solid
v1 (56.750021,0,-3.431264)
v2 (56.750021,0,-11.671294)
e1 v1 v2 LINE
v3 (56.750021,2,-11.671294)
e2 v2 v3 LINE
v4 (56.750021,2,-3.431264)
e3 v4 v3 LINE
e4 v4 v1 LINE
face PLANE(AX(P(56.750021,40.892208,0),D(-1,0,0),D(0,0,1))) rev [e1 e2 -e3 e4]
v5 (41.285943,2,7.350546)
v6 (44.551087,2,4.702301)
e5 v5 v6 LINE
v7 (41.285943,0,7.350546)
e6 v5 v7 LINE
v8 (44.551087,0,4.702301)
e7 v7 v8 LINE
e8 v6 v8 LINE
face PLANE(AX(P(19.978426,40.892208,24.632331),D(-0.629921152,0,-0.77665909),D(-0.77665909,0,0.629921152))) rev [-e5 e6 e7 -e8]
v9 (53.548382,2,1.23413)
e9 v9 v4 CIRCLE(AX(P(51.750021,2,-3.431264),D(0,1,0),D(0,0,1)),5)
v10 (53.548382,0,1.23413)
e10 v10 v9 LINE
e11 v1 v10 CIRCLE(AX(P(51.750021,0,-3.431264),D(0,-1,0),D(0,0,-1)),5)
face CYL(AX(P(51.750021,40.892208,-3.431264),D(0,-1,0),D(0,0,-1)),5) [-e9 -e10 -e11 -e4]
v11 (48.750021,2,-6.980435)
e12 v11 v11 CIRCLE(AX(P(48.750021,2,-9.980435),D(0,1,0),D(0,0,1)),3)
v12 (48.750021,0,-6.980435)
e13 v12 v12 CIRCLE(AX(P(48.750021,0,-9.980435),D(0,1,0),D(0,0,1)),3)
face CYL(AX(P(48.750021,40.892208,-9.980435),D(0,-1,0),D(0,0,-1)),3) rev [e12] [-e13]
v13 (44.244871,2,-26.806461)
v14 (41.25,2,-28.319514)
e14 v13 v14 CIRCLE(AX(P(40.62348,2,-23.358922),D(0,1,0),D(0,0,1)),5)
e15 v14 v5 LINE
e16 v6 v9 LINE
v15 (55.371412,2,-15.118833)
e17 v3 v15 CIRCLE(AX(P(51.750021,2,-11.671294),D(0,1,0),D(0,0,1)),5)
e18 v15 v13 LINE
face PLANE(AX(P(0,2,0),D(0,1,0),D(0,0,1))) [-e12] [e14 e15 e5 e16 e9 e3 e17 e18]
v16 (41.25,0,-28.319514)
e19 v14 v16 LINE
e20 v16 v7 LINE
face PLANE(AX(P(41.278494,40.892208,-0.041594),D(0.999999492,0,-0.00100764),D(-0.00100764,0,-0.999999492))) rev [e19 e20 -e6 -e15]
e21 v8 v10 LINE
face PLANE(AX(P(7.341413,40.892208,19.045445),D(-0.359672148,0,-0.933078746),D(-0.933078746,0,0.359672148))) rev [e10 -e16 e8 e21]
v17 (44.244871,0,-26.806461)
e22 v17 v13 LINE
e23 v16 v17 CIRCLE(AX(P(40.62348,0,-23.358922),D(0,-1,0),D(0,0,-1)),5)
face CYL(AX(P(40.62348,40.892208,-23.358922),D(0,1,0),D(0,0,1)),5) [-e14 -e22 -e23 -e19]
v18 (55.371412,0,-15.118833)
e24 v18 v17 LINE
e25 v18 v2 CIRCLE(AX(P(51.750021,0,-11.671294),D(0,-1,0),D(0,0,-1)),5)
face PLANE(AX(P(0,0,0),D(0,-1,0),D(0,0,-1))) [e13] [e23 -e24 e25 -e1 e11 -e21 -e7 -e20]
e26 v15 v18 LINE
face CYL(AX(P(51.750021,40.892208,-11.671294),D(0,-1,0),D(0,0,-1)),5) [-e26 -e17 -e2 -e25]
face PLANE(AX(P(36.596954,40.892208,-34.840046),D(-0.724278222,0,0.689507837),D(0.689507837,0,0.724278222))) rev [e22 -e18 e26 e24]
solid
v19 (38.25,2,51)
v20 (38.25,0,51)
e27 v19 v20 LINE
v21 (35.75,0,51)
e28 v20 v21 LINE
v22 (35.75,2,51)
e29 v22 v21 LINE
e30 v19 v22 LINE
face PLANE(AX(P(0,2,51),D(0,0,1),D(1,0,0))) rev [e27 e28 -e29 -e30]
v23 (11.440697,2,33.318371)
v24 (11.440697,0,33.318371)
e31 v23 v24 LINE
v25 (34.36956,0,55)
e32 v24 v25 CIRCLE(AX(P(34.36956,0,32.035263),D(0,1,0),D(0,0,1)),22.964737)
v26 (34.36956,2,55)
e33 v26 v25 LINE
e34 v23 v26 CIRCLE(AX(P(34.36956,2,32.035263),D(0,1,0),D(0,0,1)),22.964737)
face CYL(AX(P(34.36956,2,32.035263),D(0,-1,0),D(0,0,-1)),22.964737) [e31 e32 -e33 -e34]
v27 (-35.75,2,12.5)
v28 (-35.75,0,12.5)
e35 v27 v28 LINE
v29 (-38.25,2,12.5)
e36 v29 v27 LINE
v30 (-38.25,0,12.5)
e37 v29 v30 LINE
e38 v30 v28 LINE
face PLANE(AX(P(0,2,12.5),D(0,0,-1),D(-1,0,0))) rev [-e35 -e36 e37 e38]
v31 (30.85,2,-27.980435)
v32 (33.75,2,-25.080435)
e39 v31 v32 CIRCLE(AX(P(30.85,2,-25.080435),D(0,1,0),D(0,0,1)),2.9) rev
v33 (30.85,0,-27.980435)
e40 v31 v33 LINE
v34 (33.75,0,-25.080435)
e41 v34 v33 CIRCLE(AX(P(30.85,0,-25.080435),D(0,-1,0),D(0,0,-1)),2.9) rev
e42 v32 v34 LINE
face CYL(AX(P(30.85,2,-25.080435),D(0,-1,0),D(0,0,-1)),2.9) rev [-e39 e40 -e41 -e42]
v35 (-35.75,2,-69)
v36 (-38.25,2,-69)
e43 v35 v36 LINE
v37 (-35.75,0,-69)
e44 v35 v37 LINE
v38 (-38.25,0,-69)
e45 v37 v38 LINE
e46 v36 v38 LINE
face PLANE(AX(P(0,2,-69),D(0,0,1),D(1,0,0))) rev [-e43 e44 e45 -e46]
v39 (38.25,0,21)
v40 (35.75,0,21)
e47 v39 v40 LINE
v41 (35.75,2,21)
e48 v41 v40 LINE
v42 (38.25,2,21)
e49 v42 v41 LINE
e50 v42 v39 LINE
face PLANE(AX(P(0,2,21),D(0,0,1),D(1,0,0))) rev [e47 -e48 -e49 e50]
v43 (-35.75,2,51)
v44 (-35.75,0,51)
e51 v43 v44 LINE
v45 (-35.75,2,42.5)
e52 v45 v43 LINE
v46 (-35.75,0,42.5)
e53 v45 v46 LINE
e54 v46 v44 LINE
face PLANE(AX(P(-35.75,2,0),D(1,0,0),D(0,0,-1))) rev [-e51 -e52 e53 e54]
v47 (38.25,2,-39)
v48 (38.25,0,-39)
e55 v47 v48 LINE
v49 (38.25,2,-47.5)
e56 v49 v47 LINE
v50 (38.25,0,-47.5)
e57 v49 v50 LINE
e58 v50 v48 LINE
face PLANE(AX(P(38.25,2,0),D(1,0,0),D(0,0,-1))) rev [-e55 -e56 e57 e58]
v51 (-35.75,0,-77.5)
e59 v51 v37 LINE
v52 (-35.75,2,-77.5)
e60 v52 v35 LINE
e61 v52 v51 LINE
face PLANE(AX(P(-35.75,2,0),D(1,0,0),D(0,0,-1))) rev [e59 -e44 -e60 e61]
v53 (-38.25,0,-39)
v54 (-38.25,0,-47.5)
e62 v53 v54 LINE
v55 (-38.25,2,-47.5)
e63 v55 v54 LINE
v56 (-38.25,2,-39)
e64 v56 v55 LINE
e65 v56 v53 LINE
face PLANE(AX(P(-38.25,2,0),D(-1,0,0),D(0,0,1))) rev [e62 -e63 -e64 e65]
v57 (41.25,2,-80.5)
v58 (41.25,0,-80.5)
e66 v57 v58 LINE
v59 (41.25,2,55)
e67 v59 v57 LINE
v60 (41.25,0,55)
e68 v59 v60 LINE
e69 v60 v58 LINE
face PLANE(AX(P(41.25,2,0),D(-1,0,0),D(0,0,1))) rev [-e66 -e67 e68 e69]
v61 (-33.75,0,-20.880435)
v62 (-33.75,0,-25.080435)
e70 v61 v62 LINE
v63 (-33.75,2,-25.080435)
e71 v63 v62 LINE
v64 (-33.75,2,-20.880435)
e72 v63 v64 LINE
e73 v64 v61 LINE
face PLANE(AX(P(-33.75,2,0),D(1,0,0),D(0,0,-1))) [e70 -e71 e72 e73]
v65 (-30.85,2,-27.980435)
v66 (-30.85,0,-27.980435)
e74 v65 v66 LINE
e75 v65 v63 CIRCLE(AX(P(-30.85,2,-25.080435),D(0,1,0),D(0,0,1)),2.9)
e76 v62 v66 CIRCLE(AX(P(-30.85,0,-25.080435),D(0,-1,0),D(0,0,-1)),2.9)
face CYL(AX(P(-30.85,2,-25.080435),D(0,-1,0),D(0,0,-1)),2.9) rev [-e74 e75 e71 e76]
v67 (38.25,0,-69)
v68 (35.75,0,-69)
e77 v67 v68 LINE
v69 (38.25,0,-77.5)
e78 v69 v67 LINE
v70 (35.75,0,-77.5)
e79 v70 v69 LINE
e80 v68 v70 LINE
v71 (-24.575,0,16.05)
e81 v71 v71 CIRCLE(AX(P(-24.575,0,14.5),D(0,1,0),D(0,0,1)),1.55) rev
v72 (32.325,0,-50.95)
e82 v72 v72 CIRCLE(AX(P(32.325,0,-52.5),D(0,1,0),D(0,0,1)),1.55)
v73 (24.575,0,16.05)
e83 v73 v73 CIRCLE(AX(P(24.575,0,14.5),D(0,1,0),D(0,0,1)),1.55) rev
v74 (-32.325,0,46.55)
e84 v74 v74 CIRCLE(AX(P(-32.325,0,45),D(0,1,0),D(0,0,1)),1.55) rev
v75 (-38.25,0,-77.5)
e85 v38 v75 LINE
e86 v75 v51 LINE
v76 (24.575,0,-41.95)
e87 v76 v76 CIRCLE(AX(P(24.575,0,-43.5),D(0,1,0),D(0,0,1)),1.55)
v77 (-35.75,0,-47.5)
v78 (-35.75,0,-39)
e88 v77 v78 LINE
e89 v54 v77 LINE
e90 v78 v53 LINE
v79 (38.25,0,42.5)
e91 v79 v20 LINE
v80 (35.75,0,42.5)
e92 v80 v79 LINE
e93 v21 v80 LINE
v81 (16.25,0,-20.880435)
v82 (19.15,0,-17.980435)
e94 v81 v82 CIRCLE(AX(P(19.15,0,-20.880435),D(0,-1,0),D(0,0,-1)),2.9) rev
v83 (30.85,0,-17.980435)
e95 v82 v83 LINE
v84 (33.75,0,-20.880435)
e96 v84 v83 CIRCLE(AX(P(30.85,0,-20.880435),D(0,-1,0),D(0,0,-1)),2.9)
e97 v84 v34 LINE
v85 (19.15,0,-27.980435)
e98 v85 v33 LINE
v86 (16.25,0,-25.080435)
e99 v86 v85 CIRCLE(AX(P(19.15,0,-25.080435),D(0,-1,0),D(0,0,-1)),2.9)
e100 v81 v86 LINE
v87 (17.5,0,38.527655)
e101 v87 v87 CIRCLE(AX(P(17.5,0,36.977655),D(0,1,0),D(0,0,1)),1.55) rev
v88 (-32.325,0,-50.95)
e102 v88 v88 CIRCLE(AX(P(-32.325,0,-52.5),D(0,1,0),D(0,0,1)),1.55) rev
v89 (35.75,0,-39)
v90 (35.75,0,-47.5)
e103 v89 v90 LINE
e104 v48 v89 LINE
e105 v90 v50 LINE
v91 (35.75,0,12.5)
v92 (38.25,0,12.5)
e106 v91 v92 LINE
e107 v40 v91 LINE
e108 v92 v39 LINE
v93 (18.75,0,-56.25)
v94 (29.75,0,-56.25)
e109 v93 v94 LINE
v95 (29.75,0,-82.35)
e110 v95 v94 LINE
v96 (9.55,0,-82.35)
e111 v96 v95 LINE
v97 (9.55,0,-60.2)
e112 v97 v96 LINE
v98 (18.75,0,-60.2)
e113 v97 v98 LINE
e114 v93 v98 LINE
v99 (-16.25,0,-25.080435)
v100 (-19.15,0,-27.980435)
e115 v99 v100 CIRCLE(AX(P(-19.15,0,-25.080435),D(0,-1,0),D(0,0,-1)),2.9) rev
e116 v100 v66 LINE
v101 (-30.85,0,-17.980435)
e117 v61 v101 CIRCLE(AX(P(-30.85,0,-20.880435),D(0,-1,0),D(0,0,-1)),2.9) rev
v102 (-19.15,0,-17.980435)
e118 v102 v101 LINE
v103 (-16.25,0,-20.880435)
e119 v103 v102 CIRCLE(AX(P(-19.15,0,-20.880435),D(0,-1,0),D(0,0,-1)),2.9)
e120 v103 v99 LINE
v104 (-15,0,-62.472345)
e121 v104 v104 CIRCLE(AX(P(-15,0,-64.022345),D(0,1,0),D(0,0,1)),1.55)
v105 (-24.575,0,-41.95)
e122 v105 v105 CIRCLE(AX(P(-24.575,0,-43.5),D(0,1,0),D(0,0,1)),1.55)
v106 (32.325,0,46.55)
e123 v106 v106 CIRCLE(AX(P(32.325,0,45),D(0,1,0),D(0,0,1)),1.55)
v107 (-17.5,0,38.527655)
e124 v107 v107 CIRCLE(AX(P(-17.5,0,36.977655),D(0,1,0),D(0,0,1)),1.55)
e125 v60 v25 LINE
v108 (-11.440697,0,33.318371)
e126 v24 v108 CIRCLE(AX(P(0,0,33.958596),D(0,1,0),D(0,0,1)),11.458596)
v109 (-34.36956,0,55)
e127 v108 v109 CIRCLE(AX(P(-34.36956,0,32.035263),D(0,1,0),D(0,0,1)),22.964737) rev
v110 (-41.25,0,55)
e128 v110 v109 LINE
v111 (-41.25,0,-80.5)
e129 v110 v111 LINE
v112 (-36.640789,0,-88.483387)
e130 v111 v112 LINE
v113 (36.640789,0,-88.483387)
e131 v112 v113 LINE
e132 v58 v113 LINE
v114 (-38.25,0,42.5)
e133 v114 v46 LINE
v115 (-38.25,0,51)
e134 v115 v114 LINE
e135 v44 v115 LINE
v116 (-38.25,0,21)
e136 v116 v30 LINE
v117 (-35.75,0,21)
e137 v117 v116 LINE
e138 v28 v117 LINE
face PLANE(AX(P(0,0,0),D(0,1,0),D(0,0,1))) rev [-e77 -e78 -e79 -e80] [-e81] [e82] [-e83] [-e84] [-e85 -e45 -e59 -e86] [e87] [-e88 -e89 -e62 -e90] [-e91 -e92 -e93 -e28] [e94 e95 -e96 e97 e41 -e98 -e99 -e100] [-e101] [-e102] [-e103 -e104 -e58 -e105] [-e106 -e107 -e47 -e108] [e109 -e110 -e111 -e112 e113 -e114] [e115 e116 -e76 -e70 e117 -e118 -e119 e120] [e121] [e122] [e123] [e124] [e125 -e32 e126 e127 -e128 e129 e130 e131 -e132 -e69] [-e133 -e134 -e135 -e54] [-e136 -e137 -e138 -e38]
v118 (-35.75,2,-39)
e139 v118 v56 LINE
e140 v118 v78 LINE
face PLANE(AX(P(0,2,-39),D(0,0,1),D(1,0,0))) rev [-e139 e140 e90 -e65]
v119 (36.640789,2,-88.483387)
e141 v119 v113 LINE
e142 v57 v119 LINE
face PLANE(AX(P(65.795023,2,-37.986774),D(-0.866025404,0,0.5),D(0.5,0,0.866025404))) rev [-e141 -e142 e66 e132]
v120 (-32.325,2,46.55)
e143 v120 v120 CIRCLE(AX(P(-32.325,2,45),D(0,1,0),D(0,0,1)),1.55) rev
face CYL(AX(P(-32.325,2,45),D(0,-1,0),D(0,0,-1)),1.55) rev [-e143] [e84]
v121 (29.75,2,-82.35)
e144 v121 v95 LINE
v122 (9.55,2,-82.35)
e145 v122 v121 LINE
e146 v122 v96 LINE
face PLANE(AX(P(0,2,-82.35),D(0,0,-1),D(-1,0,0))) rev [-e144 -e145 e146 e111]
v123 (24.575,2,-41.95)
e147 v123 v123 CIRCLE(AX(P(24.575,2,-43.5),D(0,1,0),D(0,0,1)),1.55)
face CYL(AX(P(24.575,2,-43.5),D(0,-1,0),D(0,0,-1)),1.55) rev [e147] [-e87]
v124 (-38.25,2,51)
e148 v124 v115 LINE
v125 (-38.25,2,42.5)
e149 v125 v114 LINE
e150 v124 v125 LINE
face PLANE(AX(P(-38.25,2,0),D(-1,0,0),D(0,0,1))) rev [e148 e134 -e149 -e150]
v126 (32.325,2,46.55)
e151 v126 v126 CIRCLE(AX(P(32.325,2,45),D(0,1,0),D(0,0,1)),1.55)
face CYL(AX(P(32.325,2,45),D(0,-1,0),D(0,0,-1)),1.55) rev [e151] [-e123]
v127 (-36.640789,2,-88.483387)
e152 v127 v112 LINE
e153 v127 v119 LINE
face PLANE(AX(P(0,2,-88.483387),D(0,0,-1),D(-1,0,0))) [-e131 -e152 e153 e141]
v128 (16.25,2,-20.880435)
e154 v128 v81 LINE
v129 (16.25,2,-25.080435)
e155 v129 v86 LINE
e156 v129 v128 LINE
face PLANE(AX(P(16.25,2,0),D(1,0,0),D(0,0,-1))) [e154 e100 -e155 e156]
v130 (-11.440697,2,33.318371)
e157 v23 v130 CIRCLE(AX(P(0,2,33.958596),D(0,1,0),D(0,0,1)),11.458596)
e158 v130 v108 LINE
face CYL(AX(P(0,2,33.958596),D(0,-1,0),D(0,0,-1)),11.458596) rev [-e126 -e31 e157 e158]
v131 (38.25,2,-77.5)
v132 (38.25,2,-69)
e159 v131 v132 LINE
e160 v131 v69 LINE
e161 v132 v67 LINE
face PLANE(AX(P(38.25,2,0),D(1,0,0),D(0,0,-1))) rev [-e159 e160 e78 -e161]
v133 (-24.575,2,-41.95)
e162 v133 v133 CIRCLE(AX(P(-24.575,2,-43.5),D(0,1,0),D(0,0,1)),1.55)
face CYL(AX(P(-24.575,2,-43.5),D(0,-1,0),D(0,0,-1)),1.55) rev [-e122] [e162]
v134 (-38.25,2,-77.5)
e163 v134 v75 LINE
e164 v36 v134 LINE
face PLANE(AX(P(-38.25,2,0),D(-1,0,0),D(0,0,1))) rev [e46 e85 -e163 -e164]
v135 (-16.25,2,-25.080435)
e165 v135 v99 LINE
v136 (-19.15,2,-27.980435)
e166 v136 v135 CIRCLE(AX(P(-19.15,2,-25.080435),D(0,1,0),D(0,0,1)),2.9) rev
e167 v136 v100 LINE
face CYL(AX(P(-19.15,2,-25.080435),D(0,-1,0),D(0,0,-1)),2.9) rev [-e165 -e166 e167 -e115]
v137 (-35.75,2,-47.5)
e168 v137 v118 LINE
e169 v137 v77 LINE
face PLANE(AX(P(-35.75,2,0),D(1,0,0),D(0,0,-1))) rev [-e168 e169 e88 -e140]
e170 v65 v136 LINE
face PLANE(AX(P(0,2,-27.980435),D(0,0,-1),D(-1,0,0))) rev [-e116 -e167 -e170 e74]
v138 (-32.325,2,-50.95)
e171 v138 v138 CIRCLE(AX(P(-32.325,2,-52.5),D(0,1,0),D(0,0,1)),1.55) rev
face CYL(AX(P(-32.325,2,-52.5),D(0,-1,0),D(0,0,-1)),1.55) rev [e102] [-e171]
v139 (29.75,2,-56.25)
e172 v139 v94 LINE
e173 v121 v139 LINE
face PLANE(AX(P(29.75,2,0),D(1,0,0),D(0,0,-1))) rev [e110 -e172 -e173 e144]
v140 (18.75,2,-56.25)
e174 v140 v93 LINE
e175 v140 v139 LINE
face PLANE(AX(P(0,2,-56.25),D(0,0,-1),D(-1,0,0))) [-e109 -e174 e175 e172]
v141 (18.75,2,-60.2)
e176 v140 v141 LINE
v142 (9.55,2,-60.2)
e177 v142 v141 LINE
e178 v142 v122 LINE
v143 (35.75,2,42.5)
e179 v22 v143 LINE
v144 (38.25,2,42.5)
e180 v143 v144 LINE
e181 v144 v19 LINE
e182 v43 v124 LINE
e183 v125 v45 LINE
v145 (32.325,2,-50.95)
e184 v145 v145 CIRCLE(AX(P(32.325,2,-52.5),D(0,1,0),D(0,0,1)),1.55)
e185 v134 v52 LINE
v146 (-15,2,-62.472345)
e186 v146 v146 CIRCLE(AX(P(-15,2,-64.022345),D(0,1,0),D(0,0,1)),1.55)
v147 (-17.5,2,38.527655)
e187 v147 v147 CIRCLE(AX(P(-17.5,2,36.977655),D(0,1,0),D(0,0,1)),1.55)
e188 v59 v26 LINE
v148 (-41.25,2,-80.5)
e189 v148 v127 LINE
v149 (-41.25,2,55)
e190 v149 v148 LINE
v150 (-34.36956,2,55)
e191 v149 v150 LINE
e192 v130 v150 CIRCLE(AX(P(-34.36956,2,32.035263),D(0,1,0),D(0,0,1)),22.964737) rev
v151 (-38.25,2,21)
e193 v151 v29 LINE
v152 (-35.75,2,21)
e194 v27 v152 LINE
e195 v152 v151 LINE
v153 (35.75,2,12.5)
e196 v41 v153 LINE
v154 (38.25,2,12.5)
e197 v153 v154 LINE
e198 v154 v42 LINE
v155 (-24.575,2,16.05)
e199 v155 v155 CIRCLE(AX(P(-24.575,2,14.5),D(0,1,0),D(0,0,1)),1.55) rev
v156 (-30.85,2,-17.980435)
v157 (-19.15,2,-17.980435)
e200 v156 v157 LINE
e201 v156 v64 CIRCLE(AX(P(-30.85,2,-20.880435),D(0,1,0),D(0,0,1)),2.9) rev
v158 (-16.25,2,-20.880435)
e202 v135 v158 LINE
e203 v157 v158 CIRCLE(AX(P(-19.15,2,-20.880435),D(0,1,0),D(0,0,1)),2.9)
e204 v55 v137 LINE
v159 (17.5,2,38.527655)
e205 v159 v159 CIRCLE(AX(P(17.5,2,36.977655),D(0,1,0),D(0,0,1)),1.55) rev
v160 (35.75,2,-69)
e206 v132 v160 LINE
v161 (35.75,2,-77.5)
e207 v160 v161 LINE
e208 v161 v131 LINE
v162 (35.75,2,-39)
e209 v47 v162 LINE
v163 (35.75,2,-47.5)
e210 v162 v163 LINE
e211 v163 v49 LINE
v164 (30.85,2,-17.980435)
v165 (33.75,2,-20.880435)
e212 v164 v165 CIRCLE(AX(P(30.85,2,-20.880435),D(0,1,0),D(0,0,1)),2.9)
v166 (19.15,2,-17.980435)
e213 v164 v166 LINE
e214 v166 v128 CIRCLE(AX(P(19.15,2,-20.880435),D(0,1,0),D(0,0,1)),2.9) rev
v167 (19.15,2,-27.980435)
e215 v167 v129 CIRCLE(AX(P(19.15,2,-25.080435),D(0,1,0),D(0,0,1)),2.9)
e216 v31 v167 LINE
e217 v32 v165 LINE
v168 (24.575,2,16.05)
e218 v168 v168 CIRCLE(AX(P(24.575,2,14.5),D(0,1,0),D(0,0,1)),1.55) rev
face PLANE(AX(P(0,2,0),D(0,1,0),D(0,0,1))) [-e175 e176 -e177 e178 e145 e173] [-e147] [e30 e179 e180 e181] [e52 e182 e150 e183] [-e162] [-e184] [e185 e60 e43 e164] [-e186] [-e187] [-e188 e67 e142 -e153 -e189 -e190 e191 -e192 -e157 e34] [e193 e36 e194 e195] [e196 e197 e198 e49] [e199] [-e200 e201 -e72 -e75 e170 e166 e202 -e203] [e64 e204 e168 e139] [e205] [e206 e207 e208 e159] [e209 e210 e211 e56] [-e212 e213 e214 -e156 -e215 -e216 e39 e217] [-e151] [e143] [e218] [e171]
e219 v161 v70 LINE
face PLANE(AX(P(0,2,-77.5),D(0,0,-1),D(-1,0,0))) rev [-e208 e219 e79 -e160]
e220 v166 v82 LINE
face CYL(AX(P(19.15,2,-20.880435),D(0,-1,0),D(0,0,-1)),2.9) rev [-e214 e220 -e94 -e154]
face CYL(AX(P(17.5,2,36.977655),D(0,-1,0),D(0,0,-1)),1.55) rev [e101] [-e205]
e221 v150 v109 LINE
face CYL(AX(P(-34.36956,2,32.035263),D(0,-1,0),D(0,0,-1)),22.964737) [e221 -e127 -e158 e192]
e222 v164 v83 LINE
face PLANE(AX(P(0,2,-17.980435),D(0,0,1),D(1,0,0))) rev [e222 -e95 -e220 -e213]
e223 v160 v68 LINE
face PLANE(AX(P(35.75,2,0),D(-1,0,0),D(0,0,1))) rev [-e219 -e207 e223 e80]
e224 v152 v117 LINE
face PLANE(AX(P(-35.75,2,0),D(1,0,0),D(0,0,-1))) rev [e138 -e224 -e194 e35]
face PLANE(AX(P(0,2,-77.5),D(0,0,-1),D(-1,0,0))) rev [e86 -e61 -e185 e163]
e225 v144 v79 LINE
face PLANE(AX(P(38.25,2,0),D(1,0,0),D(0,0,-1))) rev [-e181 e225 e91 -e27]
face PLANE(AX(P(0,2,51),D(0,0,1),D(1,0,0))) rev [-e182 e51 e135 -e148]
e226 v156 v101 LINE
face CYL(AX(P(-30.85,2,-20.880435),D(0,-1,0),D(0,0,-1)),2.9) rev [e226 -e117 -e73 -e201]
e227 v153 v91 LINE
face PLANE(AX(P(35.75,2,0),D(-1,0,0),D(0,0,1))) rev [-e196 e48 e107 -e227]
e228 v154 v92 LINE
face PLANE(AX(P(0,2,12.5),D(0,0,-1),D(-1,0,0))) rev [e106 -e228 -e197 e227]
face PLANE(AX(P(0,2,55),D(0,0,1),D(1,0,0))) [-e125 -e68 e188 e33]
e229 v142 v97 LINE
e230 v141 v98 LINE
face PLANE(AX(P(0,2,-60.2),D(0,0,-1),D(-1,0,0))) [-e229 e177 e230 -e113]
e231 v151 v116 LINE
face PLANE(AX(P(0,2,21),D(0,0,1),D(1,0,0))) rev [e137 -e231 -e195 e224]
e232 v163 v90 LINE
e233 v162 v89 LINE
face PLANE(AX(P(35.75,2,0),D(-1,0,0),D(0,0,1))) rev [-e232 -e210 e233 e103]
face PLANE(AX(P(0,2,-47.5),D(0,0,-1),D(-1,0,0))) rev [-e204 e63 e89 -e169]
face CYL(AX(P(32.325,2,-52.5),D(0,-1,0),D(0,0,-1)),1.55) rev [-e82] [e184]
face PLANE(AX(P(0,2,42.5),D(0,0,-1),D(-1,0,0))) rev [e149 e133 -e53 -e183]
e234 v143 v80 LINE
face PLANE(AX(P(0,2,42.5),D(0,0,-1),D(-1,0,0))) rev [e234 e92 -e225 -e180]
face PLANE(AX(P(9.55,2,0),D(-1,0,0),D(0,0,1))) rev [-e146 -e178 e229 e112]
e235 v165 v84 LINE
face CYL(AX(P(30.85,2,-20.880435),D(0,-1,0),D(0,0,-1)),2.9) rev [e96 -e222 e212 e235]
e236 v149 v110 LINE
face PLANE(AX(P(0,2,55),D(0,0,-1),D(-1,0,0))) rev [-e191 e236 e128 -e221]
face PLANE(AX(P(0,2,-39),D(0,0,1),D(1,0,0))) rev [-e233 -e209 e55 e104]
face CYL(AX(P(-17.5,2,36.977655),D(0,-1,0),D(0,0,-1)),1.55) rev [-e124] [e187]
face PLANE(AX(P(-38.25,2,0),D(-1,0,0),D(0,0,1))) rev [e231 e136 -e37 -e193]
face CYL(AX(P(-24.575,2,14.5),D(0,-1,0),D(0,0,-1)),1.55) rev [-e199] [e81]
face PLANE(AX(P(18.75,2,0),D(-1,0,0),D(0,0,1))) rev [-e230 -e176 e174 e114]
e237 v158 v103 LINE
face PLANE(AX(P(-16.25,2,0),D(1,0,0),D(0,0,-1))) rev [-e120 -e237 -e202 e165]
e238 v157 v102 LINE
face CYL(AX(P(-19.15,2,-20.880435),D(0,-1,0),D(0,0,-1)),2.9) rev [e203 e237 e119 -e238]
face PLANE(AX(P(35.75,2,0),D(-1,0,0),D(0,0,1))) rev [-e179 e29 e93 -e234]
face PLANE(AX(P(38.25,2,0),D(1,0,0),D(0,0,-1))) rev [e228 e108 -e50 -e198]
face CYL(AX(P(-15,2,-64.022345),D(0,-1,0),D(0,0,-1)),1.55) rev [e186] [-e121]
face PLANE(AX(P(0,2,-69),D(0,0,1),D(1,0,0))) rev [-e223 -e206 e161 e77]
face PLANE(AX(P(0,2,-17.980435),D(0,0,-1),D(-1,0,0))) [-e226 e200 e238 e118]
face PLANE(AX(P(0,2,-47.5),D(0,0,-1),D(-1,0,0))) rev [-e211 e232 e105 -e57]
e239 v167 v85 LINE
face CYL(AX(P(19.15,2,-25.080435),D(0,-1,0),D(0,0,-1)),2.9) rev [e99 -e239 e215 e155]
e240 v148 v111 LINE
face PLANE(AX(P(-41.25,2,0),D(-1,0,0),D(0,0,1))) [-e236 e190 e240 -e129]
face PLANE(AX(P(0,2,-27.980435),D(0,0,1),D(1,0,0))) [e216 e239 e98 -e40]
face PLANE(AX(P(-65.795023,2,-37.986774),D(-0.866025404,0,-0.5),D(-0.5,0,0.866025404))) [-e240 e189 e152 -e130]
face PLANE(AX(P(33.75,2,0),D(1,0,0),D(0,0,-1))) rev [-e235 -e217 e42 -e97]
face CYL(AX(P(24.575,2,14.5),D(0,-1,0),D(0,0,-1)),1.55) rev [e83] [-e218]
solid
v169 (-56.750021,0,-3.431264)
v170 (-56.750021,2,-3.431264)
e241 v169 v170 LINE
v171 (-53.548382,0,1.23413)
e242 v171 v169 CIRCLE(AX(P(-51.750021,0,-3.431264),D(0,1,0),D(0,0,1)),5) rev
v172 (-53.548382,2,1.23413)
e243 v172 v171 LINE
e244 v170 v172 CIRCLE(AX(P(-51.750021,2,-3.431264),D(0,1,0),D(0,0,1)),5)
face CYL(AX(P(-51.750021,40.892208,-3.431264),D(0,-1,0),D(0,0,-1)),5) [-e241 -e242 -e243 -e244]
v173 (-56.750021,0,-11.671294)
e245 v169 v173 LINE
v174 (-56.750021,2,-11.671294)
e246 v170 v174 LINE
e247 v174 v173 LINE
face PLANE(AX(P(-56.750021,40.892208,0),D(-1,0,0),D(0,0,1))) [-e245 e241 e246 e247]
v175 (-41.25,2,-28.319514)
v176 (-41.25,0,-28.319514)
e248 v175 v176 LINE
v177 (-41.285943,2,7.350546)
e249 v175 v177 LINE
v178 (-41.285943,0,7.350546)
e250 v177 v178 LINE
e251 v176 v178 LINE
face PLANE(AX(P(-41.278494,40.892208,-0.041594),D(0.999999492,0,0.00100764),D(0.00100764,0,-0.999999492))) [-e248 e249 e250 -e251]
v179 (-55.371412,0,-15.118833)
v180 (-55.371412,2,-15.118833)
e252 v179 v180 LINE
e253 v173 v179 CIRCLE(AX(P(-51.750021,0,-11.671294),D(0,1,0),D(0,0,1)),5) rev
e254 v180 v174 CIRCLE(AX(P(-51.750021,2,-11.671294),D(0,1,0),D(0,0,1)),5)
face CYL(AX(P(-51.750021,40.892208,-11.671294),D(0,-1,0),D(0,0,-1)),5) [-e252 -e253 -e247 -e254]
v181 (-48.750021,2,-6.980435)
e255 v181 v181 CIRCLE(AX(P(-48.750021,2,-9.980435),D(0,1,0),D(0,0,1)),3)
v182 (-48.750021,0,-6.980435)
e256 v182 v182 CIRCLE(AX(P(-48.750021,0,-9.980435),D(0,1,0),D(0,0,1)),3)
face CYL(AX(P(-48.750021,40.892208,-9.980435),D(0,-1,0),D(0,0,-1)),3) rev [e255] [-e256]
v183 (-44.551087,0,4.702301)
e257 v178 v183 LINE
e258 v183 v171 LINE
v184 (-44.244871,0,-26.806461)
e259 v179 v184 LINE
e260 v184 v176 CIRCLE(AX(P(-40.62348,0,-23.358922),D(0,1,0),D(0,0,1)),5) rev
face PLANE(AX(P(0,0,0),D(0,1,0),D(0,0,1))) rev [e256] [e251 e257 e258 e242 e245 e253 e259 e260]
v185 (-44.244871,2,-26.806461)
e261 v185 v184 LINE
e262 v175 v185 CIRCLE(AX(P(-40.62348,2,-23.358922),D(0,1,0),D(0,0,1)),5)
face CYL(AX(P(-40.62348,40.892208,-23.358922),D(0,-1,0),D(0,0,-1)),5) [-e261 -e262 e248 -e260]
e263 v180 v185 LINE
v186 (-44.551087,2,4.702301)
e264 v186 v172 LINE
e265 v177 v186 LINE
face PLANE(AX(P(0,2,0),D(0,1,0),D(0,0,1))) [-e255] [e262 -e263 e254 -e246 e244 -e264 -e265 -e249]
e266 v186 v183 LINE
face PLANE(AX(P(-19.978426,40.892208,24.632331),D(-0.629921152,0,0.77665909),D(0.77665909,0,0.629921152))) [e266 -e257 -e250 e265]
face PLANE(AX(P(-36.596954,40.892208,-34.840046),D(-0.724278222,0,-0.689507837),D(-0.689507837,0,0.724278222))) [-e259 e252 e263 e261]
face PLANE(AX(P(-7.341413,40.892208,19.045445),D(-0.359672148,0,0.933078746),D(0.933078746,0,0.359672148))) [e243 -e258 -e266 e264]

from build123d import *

# Parameters (mm, degrees)
SKETCH1_W                   = 2.5
SKETCH1_H                   = 8.5
SKETCH1_R                   = 1.55
EXTRUDE_2777_DEPTH          = 2
SKETCH_3030_R               = 3
EXTRUDE_1_DEPTH             = 2
EXTRUDE_1_2_DEPTH           = 2
CUT_EXTRUDE_4639_DEPTH      = 106.13740862
CUT_EXTRUDE_4639_DEPTH_BACK = 106.13740862
FILLET_1_R                  = 5
FILLET_2_R                  = 5


with BuildPart() as part:
    # Sketch1 → Extrude 2777 (new body)
    with BuildSketch(Plane(origin=(0, 0, 0), x_dir=(1, 0, 0), z_dir=(0, 1, 0))):
        with BuildLine():
            Line((-41.25, 0), (-41.25, -55))
            Line((-41.25, -55), (-34.369560329, -55))
            ThreePointArc((-34.369560329, -55), (-18.59120626, -48.721265785), (-11.440696816, -33.31837076))
            ThreePointArc((-11.440696816, -33.31837076), (-7.872843983, -25.632867641), (0, -22.5))
            ThreePointArc((0, -22.5), (7.872843983, -25.632867641), (11.440696816, -33.31837076))
            ThreePointArc((11.440696816, -33.31837076), (18.59120626, -48.721265785), (34.369560329, -55))
            Line((34.369560329, -55), (41.25, -55))
            Line((41.25, -55), (41.25, 0))
            Line((41.25, 0), (41.25, 80.5))
            Line((41.25, 80.5), (36.640789302, 88.483387111))
            Line((36.640789302, 88.483387111), (-36.640789302, 88.483387111))
            Line((-36.640789302, 88.483387111), (-41.25, 80.5))
            Line((-41.25, 80.5), (-41.25, 0))
        make_face()
        with Locations((-37, -46.75)):
            Rectangle(SKETCH1_W, SKETCH1_H, mode=Mode.SUBTRACT)
        with Locations(Location((-32.325, -45, 0), (0, 0, 270))):
            Circle(SKETCH1_R, mode=Mode.SUBTRACT)
        with Locations(Location((-17.5, -36.97765453, 0), (0, 0, 270))):
            Circle(SKETCH1_R, mode=Mode.SUBTRACT)
        with Locations((-37, -16.75)):
            Rectangle(SKETCH1_W, SKETCH1_H, mode=Mode.SUBTRACT)
        with Locations(Location((-24.575, -14.5, 0), (0, 0, 270))):
            Circle(SKETCH1_R, mode=Mode.SUBTRACT)
        with Locations(Location((17.5, -36.97765453, 0), (0, 0, 270))):
            Circle(SKETCH1_R, mode=Mode.SUBTRACT)
        with Locations((37, -46.75)):
            Rectangle(SKETCH1_W, SKETCH1_H, mode=Mode.SUBTRACT)
        with Locations(Location((32.325, -45, 0), (0, 0, 270))):
            Circle(SKETCH1_R, mode=Mode.SUBTRACT)
        with Locations(Location((24.575, -14.5, 0), (0, 0, 270))):
            Circle(SKETCH1_R, mode=Mode.SUBTRACT)
        with Locations((37, -16.75)):
            Rectangle(SKETCH1_W, SKETCH1_H, mode=Mode.SUBTRACT)
        with Locations((-37, 43.25)):
            Rectangle(SKETCH1_W, SKETCH1_H, mode=Mode.SUBTRACT)
        with Locations(Location((-32.325, 52.5, 0), (0, 0, 270))):
            Circle(SKETCH1_R, mode=Mode.SUBTRACT)
        with Locations(Location((-24.575, 43.5, 0), (0, 0, 270))):
            Circle(SKETCH1_R, mode=Mode.SUBTRACT)
        with Locations((-37, 73.25)):
            Rectangle(SKETCH1_W, SKETCH1_H, mode=Mode.SUBTRACT)
        with Locations(Location((-15.000000144, 64.02234547, 0), (0, 0, 270))):
            Circle(SKETCH1_R, mode=Mode.SUBTRACT)
        with Locations(Location((24.575, 43.5, 0), (0, 0, 270))):
            Circle(SKETCH1_R, mode=Mode.SUBTRACT)
        with Locations((37, 43.25)):
            Rectangle(SKETCH1_W, SKETCH1_H, mode=Mode.SUBTRACT)
        with Locations(Location((32.325, 52.5, 0), (0, 0, 270))):
            Circle(SKETCH1_R, mode=Mode.SUBTRACT)
        Polygon((9.55, 60.2), (9.55, 82.35), (29.75, 82.35), (29.75, 56.25), (18.75, 56.25), (18.75, 60.2), align=None, mode=Mode.SUBTRACT)
        with Locations((37, 73.25)):
            Rectangle(SKETCH1_W, SKETCH1_H, mode=Mode.SUBTRACT)
    extrude(amount=EXTRUDE_2777_DEPTH)

    # 底部天线接口<3> → Cut-Extrude 4639 (cut, two sides: drawn at the far end of the back side and taken through both)
    with BuildSketch(Plane(origin=(0, 0, 0), x_dir=(1, 0, 0), z_dir=(0, 1, 0)).offset(-CUT_EXTRUDE_4639_DEPTH_BACK)):
        with BuildLine():
            Line((-30.85, 17.980435299), (-19.15, 17.980435299))
            ThreePointArc((-19.15, 17.980435299), (-17.099390335, 18.829825634), (-16.25, 20.880435299))
            Line((-16.25, 20.880435299), (-16.25, 25.080435299))
            ThreePointArc((-16.25, 25.080435299), (-17.099390335, 27.131044965), (-19.15, 27.980435299))
            Line((-19.15, 27.980435299), (-30.85, 27.980435299))
            ThreePointArc((-30.85, 27.980435299), (-32.900609665, 27.131044965), (-33.75, 25.080435299))
            Line((-33.75, 25.080435299), (-33.75, 20.880435299))
            ThreePointArc((-33.75, 20.880435299), (-32.900609665, 18.829825634), (-30.85, 17.980435299))
        make_face()
        with BuildLine():
            Line((30.85, 27.980435299), (19.15, 27.980435299))
            ThreePointArc((19.15, 27.980435299), (17.099390335, 27.131044965), (16.25, 25.080435299))
            Line((16.25, 25.080435299), (16.25, 20.880435299))
            ThreePointArc((16.25, 20.880435299), (17.099390335, 18.829825634), (19.15, 17.980435299))
            Line((19.15, 17.980435299), (30.85, 17.980435299))
            ThreePointArc((30.85, 17.980435299), (32.900609665, 18.829825634), (33.75, 20.880435299))
            Line((33.75, 20.880435299), (33.75, 25.080435299))
            ThreePointArc((33.75, 25.080435299), (32.900609665, 27.131044965), (30.85, 27.980435299))
        make_face()
    extrude(amount=CUT_EXTRUDE_4639_DEPTH + CUT_EXTRUDE_4639_DEPTH_BACK, mode=Mode.SUBTRACT)


with BuildPart() as body_2:
    # Sketch 3030 → 天线接口-1 (new body)
    with BuildSketch(Plane(origin=(0, 0, 0), x_dir=(1, 0, 0), z_dir=(0, 1, 0))):
        Polygon((-44.551087495, -4.702300511), (-41.285942601, -7.350545872), (-41.25, 28.319513771), (-42.804455524, 28.319513771), (-56.750021115, 13.670703557), (-56.750021115, 0), align=None)
        with Locations(Location((-48.750021115, 9.980435299, 0), (0, 0, 270))):
            Circle(SKETCH_3030_R, mode=Mode.SUBTRACT)
    extrude(amount=EXTRUDE_1_DEPTH)

    # 圆角1
    # the kernel refuses this fillet: 5 mm, written as the material it takes off along each edge
    with BuildSketch(Plane(origin=(-56.750021115, -8.578159327, 0), x_dir=(0, 0, -1), z_dir=(0, 1, 0))) as fillet_1_piece_1:
        with BuildLine():
            CenterArc((FILLET_1_R * 0.686252746169, -FILLET_1_R), FILLET_1_R, 90, 68.919937097)
            Line((-FILLET_1_R * 0.246825999537, -FILLET_1_R * 0.640327851633), (-FILLET_1_R * 0.265487574451, -FILLET_1_R * 0.633134408666))
            Line((-FILLET_1_R * 0.265487574451, -FILLET_1_R * 0.633134408666), (-FILLET_1_R * 0.0137250549234, FILLET_1_R * 0.02))
            Line((-FILLET_1_R * 0.0137250549234, FILLET_1_R * 0.02), (FILLET_1_R * 0.686252746169, FILLET_1_R * 0.02))
            Line((FILLET_1_R * 0.686252746169, FILLET_1_R * 0.02), (FILLET_1_R * 0.686252746169, 0))
        make_face()
    extrude(amount=19.156318654, mode=Mode.SUBTRACT)
    with BuildSketch(Plane(origin=(-56.750021115, -4.998525097, -13.670703557), x_dir=(0.6895078371932688, 0, -0.7242782217139079), z_dir=(0, 1, 0))) as fillet_1_piece_2:
        with BuildLine():
            CenterArc((FILLET_1_R * 0.399882007735, -FILLET_1_R), FILLET_1_R, 90, 43.591162535)
            Line((-FILLET_1_R * 0.289625829458, -FILLET_1_R * 0.275721778286), (-FILLET_1_R * 0.303415986202, -FILLET_1_R * 0.261236213852))
            Line((-FILLET_1_R * 0.303415986202, -FILLET_1_R * 0.261236213852), (-FILLET_1_R * 0.00799764015471, FILLET_1_R * 0.02))
            Line((-FILLET_1_R * 0.00799764015471, FILLET_1_R * 0.02), (FILLET_1_R * 0.399882007735, FILLET_1_R * 0.02))
            Line((FILLET_1_R * 0.399882007735, FILLET_1_R * 0.02), (FILLET_1_R * 0.399882007735, 0))
        make_face()
    extrude(amount=11.997050193, mode=Mode.SUBTRACT)
    with BuildSketch(Plane(origin=(-42.804455524, -5.222622885, -28.319513771), x_dir=(1, 0, 0), z_dir=(0, 1, 0))) as fillet_1_piece_3:
        with BuildLine():
            CenterArc((2.180975345, -4.960591992), FILLET_1_R, 97.198309661, 39.210527804)
            Line((-1.440415764, -1.513052806), (-1.512843586, -1.444102023))
            Line((-1.512843586, -1.444102023), (-0.072427822, 0.068950784))
            Line((-0.072427822, 0.068950784), (0, 0.1))
            ThreePointArc((0, 0.1), (0.777227762, 0.1), (1.541925127, 0.09921184))
            Line((1.541925127, 0.09921184), (1.554455524, 0))
        make_face()
    extrude(amount=12.44524577, mode=Mode.SUBTRACT)


with BuildPart() as body_3:
    # Sketch 3030 → Extrude 1 2 (new body)
    with BuildSketch(Plane(origin=(0, 0, 0), x_dir=(1, 0, 0), z_dir=(0, 1, 0))):
        Polygon((42.804455524, 28.319513771), (56.750021115, 13.670703557), (56.750021115, 0), (44.551087495, -4.702300511), (41.285942601, -7.350545872), (41.25, 28.319513771), align=None)
        with Locations(Location((48.750021115, 9.980435299, 0), (0, 0, 270))):
            Circle(SKETCH_3030_R, mode=Mode.SUBTRACT)
    extrude(amount=EXTRUDE_1_2_DEPTH)

    # 圆角2
    # the kernel refuses this fillet: 5 mm, written as the material it takes off along each edge
    with BuildSketch(Plane(origin=(56.750021115, -8.578159327, 0), x_dir=(0, 0, -1), z_dir=(0, 1, 0))) as fillet_2_piece_1:
        with BuildLine():
            CenterArc((FILLET_2_R * 0.686252746169, FILLET_2_R), FILLET_2_R, 201.080062903, 68.919937097)
            Line((-FILLET_2_R * 0.246825999537, FILLET_2_R * 0.640327851633), (-FILLET_2_R * 0.265487574451, FILLET_2_R * 0.633134408666))
            Line((-FILLET_2_R * 0.265487574451, FILLET_2_R * 0.633134408666), (-FILLET_2_R * 0.0137250549234, -FILLET_2_R * 0.02))
            Line((-FILLET_2_R * 0.0137250549234, -FILLET_2_R * 0.02), (FILLET_2_R * 0.686252746169, -FILLET_2_R * 0.02))
            Line((FILLET_2_R * 0.686252746169, -FILLET_2_R * 0.02), (FILLET_2_R * 0.686252746169, 0))
        make_face()
    extrude(amount=19.156318654, mode=Mode.SUBTRACT)
    with BuildSketch(Plane(origin=(56.750021115, -4.998525097, -13.670703557), x_dir=(-0.6895078371932707, 0, -0.724278221713906), z_dir=(0, 1, 0))) as fillet_2_piece_2:
        with BuildLine():
            CenterArc((FILLET_2_R * 0.399882007735, FILLET_2_R), FILLET_2_R, 226.408837465, 43.591162535)
            Line((-FILLET_2_R * 0.289625829458, FILLET_2_R * 0.275721778286), (-FILLET_2_R * 0.303415986202, FILLET_2_R * 0.261236213852))
            Line((-FILLET_2_R * 0.303415986202, FILLET_2_R * 0.261236213852), (-FILLET_2_R * 0.00799764015471, -FILLET_2_R * 0.02))
            Line((-FILLET_2_R * 0.00799764015471, -FILLET_2_R * 0.02), (FILLET_2_R * 0.399882007735, -FILLET_2_R * 0.02))
            Line((FILLET_2_R * 0.399882007735, -FILLET_2_R * 0.02), (FILLET_2_R * 0.399882007735, 0))
        make_face()
    extrude(amount=11.997050193, mode=Mode.SUBTRACT)
    with BuildSketch(Plane(origin=(42.804455524, -5.222622885, -28.319513771), x_dir=(0.6895078371932738, 0, 0.7242782217139031), z_dir=(0, 1, 0))) as fillet_2_piece_3:
        with BuildLine():
            CenterArc((2.089049154, -5), FILLET_2_R, 90, 39.210527804)
            Line((-1.071809266, -1.125858282), (-1.135026435, -1.048375448))
            ThreePointArc((-1.135026435, -1.048375448), (-0.608332455, -0.493978358), (-0.072427822, 0.068950784))
            Line((-0.072427822, 0.068950784), (0, 0.1))
            Line((0, 0.1), (2.089049154, 0.1))
            Line((2.089049154, 0.1), (2.089049154, 0))
        make_face()
    extrude(amount=12.44524577, mode=Mode.SUBTRACT)


solid = Compound([part.part, body_2.part, body_3.part])
